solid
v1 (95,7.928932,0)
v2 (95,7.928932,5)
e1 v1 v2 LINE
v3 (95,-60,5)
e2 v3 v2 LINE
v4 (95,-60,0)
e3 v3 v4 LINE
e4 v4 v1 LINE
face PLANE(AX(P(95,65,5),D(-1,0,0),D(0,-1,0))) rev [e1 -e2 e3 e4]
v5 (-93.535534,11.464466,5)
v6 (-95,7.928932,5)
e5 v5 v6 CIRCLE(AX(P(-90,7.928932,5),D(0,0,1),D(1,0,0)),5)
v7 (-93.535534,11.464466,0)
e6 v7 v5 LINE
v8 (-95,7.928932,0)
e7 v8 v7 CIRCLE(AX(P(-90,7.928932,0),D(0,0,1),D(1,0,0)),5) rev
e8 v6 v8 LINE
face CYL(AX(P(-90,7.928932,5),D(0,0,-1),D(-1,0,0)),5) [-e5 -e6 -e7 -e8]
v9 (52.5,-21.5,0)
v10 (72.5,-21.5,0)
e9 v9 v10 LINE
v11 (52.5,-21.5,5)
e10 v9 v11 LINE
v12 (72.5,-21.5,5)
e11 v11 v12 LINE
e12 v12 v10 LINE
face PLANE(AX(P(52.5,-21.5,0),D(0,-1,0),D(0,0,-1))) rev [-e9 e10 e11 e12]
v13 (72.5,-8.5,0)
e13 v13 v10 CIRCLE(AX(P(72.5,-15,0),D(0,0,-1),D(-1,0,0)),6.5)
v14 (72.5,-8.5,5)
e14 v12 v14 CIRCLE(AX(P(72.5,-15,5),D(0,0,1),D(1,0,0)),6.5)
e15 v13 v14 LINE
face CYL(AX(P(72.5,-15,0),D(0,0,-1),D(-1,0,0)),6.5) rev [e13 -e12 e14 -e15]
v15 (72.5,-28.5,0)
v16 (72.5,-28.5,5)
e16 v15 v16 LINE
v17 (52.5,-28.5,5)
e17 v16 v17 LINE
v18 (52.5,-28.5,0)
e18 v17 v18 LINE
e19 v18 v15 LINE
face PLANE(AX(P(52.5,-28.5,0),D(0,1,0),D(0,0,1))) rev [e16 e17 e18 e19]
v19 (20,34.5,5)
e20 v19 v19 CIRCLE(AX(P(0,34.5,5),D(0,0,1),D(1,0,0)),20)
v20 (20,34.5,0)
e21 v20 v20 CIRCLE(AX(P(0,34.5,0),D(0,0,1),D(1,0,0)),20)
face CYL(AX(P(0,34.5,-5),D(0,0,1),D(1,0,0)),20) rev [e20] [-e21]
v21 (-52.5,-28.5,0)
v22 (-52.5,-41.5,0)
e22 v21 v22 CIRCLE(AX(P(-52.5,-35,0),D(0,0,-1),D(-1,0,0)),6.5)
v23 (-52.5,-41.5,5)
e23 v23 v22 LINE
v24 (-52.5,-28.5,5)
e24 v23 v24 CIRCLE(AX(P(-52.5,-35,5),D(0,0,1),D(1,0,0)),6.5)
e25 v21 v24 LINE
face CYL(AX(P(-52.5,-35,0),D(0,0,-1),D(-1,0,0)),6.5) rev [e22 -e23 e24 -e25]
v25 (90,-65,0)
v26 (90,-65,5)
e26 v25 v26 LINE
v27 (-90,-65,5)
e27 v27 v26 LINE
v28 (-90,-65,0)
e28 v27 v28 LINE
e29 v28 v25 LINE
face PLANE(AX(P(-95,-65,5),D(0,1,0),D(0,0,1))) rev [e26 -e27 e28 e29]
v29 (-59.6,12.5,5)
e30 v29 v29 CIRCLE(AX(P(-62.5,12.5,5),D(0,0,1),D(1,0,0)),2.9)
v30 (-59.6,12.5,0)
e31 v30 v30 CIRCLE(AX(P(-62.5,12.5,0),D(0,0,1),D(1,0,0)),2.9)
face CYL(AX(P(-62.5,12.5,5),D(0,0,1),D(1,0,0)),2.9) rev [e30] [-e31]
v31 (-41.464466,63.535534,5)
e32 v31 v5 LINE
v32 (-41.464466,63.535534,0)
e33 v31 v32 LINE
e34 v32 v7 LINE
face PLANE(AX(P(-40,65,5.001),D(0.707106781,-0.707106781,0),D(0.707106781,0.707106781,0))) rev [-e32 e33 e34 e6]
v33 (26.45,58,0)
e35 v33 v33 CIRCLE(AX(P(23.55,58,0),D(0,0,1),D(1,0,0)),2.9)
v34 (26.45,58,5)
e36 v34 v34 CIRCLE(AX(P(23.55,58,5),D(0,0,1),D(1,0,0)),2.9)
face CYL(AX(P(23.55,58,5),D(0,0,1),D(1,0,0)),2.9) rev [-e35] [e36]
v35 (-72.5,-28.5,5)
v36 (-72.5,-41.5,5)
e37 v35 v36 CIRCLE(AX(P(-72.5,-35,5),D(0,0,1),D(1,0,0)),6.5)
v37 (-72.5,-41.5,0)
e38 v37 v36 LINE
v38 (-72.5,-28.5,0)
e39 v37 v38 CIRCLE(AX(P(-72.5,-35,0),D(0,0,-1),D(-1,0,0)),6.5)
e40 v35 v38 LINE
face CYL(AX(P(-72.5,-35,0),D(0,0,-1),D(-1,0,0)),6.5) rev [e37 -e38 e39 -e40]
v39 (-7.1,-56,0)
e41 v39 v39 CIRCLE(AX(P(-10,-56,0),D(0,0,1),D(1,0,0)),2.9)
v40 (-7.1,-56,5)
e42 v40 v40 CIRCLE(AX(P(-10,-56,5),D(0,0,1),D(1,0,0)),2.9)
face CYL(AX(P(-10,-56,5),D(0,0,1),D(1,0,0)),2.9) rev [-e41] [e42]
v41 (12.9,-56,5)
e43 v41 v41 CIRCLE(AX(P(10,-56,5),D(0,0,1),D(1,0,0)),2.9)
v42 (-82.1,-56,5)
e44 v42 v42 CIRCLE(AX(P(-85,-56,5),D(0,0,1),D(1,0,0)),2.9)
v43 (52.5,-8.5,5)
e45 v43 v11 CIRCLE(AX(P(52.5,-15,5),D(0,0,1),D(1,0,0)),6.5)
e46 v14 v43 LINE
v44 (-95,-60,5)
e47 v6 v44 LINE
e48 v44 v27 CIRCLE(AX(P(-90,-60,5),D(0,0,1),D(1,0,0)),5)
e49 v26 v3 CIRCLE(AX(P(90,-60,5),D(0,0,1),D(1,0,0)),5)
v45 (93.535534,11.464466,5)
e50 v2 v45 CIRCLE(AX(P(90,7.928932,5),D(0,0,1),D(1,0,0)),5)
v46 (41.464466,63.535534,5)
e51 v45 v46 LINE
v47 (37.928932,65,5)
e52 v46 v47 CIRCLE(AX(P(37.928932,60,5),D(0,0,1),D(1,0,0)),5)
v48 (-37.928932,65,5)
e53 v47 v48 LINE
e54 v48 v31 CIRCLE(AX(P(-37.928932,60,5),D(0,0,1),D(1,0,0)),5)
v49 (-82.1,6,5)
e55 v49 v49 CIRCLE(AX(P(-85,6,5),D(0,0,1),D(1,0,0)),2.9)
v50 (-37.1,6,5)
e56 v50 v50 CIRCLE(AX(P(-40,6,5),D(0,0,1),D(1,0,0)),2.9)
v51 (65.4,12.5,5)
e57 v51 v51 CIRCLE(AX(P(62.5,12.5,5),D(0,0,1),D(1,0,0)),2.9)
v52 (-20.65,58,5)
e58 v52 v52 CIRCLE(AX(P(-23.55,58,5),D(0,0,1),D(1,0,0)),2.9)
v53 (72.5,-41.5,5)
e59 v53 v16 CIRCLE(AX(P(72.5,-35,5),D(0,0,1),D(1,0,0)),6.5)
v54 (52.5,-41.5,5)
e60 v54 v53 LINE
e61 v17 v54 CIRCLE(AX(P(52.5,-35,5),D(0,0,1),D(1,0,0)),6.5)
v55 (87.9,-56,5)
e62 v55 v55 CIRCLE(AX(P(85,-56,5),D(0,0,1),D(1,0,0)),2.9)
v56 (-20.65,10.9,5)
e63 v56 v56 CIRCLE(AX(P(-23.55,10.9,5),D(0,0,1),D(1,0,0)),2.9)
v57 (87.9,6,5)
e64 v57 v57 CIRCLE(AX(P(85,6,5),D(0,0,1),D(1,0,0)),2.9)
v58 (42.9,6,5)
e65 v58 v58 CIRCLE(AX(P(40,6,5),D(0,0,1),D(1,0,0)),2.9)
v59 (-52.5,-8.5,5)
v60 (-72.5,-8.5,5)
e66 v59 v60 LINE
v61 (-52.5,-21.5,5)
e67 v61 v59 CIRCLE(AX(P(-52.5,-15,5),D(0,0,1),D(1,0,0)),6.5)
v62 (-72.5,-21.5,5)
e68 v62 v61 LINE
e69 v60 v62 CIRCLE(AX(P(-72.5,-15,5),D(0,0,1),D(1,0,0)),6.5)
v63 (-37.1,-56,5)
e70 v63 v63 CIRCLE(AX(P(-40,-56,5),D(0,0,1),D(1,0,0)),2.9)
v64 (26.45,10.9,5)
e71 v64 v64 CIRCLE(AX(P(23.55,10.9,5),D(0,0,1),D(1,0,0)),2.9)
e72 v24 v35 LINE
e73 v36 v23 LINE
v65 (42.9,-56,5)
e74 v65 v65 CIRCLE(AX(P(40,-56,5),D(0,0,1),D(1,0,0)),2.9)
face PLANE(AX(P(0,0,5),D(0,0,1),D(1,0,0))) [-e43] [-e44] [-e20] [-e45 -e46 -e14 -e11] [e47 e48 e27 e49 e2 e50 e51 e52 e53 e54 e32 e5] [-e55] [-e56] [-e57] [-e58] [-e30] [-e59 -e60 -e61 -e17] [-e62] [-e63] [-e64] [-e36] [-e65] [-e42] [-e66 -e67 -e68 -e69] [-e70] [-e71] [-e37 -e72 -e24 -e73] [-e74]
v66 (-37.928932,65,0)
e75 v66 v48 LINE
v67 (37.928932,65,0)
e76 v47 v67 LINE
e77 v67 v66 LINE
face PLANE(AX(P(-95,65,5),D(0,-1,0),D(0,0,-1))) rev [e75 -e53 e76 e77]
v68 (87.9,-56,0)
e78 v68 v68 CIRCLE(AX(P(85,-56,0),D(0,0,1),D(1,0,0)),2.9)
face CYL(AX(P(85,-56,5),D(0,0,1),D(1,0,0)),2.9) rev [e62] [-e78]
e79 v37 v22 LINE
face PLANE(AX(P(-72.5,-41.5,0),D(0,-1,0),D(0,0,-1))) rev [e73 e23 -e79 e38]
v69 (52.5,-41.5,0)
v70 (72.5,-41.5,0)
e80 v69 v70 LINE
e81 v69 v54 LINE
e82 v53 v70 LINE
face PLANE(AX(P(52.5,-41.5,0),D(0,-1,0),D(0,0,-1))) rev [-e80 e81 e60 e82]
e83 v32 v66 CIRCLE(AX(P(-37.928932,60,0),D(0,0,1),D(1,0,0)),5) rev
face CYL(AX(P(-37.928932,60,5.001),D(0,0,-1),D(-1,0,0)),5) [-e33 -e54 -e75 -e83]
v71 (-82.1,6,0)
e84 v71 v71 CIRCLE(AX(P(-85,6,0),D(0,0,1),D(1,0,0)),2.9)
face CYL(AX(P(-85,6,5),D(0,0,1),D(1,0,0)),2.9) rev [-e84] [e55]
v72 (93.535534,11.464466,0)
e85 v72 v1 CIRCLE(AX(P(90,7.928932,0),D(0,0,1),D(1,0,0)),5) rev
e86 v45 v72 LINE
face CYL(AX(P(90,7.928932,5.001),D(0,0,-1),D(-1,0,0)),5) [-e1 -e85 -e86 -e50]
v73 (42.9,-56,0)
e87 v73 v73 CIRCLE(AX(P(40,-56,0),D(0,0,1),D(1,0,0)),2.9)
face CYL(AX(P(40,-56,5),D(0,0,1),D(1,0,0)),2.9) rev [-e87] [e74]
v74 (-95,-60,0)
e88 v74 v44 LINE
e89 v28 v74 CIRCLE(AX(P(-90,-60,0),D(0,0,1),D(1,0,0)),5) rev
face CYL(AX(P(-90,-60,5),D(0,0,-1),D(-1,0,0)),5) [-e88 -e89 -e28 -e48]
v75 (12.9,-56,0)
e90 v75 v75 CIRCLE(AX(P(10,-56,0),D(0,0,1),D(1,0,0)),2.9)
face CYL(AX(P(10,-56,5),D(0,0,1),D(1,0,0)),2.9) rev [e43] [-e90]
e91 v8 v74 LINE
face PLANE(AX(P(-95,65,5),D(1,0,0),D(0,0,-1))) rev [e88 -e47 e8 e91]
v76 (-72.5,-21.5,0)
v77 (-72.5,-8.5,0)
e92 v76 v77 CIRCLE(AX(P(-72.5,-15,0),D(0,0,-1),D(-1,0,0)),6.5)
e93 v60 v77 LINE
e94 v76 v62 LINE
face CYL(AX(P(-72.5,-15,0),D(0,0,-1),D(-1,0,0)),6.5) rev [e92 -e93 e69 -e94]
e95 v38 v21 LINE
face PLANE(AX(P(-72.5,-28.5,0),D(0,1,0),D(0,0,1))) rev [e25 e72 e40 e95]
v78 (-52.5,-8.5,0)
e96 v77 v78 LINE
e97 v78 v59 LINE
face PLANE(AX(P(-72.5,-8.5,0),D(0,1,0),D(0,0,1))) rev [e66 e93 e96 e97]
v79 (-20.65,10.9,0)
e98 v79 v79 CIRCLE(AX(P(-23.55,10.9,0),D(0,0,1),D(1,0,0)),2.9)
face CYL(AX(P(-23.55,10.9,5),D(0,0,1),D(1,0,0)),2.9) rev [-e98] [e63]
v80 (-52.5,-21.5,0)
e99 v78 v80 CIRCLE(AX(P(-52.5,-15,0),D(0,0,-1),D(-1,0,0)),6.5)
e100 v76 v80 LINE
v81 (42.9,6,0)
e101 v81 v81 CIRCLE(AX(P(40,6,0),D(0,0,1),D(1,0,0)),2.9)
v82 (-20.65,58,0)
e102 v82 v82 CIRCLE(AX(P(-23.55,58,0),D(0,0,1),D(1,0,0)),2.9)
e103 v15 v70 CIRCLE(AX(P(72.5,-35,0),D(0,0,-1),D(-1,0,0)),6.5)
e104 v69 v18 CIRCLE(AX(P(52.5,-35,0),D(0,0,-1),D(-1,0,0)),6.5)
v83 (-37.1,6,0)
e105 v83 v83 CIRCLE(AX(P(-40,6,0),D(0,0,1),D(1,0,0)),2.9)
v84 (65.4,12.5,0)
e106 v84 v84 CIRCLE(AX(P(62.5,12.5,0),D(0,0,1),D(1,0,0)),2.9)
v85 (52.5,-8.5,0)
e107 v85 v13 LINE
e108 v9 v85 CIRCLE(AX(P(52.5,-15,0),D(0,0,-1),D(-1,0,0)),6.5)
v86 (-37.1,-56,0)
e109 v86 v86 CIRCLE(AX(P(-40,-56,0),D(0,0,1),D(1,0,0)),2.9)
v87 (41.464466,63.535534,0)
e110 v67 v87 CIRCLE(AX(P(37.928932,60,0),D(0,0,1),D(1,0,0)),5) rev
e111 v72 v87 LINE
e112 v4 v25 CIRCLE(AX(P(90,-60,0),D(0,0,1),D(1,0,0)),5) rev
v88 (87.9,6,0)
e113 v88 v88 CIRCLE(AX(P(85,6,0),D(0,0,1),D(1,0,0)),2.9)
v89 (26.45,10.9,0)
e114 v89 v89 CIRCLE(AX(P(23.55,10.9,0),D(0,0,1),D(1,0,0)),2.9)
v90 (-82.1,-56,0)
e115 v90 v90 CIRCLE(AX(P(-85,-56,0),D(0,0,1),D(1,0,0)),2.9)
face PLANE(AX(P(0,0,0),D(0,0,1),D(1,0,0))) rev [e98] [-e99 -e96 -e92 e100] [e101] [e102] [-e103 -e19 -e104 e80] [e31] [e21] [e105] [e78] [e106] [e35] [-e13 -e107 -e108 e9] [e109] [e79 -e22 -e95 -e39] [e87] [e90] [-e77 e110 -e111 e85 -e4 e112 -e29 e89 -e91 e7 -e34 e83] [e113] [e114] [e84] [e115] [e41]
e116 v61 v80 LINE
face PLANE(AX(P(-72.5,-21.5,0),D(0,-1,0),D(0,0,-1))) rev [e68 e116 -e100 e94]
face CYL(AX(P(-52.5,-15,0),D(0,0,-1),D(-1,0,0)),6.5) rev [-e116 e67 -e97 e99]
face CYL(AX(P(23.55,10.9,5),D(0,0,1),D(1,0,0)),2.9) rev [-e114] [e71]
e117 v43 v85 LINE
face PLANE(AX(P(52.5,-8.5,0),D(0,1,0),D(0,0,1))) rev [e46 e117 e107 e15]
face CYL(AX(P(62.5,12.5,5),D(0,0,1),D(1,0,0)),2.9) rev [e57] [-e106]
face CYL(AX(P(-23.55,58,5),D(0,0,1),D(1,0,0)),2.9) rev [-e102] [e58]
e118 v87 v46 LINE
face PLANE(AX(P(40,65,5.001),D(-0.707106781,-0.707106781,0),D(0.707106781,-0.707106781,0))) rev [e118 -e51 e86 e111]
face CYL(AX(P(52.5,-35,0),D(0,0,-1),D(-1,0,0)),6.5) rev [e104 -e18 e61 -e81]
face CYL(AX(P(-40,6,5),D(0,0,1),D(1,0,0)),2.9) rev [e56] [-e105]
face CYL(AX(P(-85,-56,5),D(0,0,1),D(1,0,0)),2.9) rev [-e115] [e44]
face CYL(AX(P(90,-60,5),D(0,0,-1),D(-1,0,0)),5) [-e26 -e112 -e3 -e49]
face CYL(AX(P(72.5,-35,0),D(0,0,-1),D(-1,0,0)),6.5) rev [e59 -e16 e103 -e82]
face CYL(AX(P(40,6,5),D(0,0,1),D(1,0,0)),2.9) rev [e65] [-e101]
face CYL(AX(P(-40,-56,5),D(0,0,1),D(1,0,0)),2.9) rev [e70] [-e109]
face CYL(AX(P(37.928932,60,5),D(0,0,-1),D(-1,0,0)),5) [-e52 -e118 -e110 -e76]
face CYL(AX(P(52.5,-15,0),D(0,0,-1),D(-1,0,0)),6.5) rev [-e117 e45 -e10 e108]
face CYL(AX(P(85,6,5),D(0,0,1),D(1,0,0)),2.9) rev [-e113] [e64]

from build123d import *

# Parameters (mm, degrees)
SKETCH1_W                      = 190
SKETCH1_H                      = 130
BOSS_EXTRUDE1_DEPTH            = 5
M5_CLEARANCE_HOLE1_D           = 5.8
SKETCH6_R                      = 20
CUT_EXTRUDE1_DEPTH             = 10
F_13_0_13_DIAMETER_SLOT1_DEPTH = 5
CUT_EXTRUDE2_REACH             = 117.217
FILLET1_R                      = 5
M5_CLEARANCE_HOLE2_D           = 5.8


# Read off the part's stored shape, not the designer's step: Ø13.0 (13) Diameter Slot1
with BuildPart() as part:
    # Sketch1 → Boss-Extrude1 (new body)
    with BuildSketch(Plane.XY):
        Rectangle(SKETCH1_W, SKETCH1_H)
    extrude(amount=BOSS_EXTRUDE1_DEPTH)

    # M5 Clearance Hole1 (through all)
    with Locations(Plane.XY.offset(5)):
        with Locations((-40, 6), (40, 6), (-40, -56), (40, -56), (-23.55, 58), (23.55, 58), (-23.55, 10.9), (23.55, 10.9), (-10, -56), (10, -56), (-85, 6), (85, 6), (-85, -56), (85, -56)):
            Hole(M5_CLEARANCE_HOLE1_D / 2)

    # Sketch6 → Cut-Extrude1 (cut)
    with BuildSketch(Plane.XY.offset(5)):
        with Locations((0, 34.5)):
            Circle(SKETCH6_R)
    extrude(amount=-CUT_EXTRUDE1_DEPTH, mode=Mode.SUBTRACT)

    # Ø13.0 (13) Diameter Slot1 outline → Ø13.0 (13) Diameter Slot1 (cut)
    with BuildSketch(Plane.XY):
        with BuildLine():
            ThreePointArc((-52.5, -41.5), (-46, -35), (-52.5, -28.5))
            Line((-52.5, -28.5), (-72.5, -28.5))
            ThreePointArc((-72.5, -28.5), (-79, -35), (-72.5, -41.5))
            Line((-72.5, -41.5), (-52.5, -41.5))
        make_face()
        with BuildLine():
            ThreePointArc((52.5, -28.5), (46, -35), (52.5, -41.5))
            Line((52.5, -41.5), (72.5, -41.5))
            ThreePointArc((72.5, -41.5), (79, -35), (72.5, -28.5))
            Line((72.5, -28.5), (52.5, -28.5))
        make_face()
        with BuildLine():
            ThreePointArc((-52.5, -21.5), (-46, -15), (-52.5, -8.5))
            Line((-52.5, -8.5), (-72.5, -8.5))
            ThreePointArc((-72.5, -8.5), (-79, -15), (-72.5, -21.5))
            Line((-72.5, -21.5), (-52.5, -21.5))
        make_face()
        with BuildLine():
            ThreePointArc((52.5, -8.5), (46, -15), (52.5, -21.5))
            Line((52.5, -21.5), (72.5, -21.5))
            ThreePointArc((72.5, -21.5), (79, -15), (72.5, -8.5))
            Line((72.5, -8.5), (52.5, -8.5))
        make_face()
    extrude(amount=F_13_0_13_DIAMETER_SLOT1_DEPTH, mode=Mode.SUBTRACT)

    # Sketch14 → Cut-Extrude2 (cut, up to next)
    with BuildSketch(Plane(origin=(0, 0, 0), x_dir=(-1, 0, 0), z_dir=(0, 0, -1)), mode=Mode.PRIVATE) as cut_extrude2_sk1:
        Polygon((-40, 65), (-95, 10), (-95, 65), align=None)
    cut_extrude2_tool1 = extrude(cut_extrude2_sk1.sketch, amount=-CUT_EXTRUDE2_REACH, mode=Mode.PRIVATE) & part.part
    # Sketch14 → Cut-Extrude2 (cut, up to next)
    with BuildSketch(Plane(origin=(0, 0, 0), x_dir=(-1, 0, 0), z_dir=(0, 0, -1)), mode=Mode.PRIVATE) as cut_extrude2_sk2:
        Polygon((40, 65), (95, 10), (95, 65), align=None)
    cut_extrude2_tool2 = extrude(cut_extrude2_sk2.sketch, amount=-CUT_EXTRUDE2_REACH, mode=Mode.PRIVATE) & part.part
    add(cut_extrude2_tool1.solids().sort_by_distance((76.666667, 46.666667, 0))[0], mode=Mode.SUBTRACT)
    add(cut_extrude2_tool2.solids().sort_by_distance((-76.666667, 46.666667, 0))[0], mode=Mode.SUBTRACT)

    # Fillet1
    fillet1_edges = [part.edges().sort_by_distance(p)[0] for p in [
        (40, 65, 2.5),
        (95, 10, 2.5),
        (-40, 65, 2.5),
        (-95, 10, 2.5),
        (95, -65, 2.5),
        (-95, -65, 2.5),
    ]]
    fillet(fillet1_edges, radius=FILLET1_R)

    # M5 Clearance Hole2 (through all)
    with Locations(Plane.XY.offset(5)):
        with Locations((62.5, 12.5), (-62.5, 12.5)):
            Hole(M5_CLEARANCE_HOLE2_D / 2)


solid = part.part
